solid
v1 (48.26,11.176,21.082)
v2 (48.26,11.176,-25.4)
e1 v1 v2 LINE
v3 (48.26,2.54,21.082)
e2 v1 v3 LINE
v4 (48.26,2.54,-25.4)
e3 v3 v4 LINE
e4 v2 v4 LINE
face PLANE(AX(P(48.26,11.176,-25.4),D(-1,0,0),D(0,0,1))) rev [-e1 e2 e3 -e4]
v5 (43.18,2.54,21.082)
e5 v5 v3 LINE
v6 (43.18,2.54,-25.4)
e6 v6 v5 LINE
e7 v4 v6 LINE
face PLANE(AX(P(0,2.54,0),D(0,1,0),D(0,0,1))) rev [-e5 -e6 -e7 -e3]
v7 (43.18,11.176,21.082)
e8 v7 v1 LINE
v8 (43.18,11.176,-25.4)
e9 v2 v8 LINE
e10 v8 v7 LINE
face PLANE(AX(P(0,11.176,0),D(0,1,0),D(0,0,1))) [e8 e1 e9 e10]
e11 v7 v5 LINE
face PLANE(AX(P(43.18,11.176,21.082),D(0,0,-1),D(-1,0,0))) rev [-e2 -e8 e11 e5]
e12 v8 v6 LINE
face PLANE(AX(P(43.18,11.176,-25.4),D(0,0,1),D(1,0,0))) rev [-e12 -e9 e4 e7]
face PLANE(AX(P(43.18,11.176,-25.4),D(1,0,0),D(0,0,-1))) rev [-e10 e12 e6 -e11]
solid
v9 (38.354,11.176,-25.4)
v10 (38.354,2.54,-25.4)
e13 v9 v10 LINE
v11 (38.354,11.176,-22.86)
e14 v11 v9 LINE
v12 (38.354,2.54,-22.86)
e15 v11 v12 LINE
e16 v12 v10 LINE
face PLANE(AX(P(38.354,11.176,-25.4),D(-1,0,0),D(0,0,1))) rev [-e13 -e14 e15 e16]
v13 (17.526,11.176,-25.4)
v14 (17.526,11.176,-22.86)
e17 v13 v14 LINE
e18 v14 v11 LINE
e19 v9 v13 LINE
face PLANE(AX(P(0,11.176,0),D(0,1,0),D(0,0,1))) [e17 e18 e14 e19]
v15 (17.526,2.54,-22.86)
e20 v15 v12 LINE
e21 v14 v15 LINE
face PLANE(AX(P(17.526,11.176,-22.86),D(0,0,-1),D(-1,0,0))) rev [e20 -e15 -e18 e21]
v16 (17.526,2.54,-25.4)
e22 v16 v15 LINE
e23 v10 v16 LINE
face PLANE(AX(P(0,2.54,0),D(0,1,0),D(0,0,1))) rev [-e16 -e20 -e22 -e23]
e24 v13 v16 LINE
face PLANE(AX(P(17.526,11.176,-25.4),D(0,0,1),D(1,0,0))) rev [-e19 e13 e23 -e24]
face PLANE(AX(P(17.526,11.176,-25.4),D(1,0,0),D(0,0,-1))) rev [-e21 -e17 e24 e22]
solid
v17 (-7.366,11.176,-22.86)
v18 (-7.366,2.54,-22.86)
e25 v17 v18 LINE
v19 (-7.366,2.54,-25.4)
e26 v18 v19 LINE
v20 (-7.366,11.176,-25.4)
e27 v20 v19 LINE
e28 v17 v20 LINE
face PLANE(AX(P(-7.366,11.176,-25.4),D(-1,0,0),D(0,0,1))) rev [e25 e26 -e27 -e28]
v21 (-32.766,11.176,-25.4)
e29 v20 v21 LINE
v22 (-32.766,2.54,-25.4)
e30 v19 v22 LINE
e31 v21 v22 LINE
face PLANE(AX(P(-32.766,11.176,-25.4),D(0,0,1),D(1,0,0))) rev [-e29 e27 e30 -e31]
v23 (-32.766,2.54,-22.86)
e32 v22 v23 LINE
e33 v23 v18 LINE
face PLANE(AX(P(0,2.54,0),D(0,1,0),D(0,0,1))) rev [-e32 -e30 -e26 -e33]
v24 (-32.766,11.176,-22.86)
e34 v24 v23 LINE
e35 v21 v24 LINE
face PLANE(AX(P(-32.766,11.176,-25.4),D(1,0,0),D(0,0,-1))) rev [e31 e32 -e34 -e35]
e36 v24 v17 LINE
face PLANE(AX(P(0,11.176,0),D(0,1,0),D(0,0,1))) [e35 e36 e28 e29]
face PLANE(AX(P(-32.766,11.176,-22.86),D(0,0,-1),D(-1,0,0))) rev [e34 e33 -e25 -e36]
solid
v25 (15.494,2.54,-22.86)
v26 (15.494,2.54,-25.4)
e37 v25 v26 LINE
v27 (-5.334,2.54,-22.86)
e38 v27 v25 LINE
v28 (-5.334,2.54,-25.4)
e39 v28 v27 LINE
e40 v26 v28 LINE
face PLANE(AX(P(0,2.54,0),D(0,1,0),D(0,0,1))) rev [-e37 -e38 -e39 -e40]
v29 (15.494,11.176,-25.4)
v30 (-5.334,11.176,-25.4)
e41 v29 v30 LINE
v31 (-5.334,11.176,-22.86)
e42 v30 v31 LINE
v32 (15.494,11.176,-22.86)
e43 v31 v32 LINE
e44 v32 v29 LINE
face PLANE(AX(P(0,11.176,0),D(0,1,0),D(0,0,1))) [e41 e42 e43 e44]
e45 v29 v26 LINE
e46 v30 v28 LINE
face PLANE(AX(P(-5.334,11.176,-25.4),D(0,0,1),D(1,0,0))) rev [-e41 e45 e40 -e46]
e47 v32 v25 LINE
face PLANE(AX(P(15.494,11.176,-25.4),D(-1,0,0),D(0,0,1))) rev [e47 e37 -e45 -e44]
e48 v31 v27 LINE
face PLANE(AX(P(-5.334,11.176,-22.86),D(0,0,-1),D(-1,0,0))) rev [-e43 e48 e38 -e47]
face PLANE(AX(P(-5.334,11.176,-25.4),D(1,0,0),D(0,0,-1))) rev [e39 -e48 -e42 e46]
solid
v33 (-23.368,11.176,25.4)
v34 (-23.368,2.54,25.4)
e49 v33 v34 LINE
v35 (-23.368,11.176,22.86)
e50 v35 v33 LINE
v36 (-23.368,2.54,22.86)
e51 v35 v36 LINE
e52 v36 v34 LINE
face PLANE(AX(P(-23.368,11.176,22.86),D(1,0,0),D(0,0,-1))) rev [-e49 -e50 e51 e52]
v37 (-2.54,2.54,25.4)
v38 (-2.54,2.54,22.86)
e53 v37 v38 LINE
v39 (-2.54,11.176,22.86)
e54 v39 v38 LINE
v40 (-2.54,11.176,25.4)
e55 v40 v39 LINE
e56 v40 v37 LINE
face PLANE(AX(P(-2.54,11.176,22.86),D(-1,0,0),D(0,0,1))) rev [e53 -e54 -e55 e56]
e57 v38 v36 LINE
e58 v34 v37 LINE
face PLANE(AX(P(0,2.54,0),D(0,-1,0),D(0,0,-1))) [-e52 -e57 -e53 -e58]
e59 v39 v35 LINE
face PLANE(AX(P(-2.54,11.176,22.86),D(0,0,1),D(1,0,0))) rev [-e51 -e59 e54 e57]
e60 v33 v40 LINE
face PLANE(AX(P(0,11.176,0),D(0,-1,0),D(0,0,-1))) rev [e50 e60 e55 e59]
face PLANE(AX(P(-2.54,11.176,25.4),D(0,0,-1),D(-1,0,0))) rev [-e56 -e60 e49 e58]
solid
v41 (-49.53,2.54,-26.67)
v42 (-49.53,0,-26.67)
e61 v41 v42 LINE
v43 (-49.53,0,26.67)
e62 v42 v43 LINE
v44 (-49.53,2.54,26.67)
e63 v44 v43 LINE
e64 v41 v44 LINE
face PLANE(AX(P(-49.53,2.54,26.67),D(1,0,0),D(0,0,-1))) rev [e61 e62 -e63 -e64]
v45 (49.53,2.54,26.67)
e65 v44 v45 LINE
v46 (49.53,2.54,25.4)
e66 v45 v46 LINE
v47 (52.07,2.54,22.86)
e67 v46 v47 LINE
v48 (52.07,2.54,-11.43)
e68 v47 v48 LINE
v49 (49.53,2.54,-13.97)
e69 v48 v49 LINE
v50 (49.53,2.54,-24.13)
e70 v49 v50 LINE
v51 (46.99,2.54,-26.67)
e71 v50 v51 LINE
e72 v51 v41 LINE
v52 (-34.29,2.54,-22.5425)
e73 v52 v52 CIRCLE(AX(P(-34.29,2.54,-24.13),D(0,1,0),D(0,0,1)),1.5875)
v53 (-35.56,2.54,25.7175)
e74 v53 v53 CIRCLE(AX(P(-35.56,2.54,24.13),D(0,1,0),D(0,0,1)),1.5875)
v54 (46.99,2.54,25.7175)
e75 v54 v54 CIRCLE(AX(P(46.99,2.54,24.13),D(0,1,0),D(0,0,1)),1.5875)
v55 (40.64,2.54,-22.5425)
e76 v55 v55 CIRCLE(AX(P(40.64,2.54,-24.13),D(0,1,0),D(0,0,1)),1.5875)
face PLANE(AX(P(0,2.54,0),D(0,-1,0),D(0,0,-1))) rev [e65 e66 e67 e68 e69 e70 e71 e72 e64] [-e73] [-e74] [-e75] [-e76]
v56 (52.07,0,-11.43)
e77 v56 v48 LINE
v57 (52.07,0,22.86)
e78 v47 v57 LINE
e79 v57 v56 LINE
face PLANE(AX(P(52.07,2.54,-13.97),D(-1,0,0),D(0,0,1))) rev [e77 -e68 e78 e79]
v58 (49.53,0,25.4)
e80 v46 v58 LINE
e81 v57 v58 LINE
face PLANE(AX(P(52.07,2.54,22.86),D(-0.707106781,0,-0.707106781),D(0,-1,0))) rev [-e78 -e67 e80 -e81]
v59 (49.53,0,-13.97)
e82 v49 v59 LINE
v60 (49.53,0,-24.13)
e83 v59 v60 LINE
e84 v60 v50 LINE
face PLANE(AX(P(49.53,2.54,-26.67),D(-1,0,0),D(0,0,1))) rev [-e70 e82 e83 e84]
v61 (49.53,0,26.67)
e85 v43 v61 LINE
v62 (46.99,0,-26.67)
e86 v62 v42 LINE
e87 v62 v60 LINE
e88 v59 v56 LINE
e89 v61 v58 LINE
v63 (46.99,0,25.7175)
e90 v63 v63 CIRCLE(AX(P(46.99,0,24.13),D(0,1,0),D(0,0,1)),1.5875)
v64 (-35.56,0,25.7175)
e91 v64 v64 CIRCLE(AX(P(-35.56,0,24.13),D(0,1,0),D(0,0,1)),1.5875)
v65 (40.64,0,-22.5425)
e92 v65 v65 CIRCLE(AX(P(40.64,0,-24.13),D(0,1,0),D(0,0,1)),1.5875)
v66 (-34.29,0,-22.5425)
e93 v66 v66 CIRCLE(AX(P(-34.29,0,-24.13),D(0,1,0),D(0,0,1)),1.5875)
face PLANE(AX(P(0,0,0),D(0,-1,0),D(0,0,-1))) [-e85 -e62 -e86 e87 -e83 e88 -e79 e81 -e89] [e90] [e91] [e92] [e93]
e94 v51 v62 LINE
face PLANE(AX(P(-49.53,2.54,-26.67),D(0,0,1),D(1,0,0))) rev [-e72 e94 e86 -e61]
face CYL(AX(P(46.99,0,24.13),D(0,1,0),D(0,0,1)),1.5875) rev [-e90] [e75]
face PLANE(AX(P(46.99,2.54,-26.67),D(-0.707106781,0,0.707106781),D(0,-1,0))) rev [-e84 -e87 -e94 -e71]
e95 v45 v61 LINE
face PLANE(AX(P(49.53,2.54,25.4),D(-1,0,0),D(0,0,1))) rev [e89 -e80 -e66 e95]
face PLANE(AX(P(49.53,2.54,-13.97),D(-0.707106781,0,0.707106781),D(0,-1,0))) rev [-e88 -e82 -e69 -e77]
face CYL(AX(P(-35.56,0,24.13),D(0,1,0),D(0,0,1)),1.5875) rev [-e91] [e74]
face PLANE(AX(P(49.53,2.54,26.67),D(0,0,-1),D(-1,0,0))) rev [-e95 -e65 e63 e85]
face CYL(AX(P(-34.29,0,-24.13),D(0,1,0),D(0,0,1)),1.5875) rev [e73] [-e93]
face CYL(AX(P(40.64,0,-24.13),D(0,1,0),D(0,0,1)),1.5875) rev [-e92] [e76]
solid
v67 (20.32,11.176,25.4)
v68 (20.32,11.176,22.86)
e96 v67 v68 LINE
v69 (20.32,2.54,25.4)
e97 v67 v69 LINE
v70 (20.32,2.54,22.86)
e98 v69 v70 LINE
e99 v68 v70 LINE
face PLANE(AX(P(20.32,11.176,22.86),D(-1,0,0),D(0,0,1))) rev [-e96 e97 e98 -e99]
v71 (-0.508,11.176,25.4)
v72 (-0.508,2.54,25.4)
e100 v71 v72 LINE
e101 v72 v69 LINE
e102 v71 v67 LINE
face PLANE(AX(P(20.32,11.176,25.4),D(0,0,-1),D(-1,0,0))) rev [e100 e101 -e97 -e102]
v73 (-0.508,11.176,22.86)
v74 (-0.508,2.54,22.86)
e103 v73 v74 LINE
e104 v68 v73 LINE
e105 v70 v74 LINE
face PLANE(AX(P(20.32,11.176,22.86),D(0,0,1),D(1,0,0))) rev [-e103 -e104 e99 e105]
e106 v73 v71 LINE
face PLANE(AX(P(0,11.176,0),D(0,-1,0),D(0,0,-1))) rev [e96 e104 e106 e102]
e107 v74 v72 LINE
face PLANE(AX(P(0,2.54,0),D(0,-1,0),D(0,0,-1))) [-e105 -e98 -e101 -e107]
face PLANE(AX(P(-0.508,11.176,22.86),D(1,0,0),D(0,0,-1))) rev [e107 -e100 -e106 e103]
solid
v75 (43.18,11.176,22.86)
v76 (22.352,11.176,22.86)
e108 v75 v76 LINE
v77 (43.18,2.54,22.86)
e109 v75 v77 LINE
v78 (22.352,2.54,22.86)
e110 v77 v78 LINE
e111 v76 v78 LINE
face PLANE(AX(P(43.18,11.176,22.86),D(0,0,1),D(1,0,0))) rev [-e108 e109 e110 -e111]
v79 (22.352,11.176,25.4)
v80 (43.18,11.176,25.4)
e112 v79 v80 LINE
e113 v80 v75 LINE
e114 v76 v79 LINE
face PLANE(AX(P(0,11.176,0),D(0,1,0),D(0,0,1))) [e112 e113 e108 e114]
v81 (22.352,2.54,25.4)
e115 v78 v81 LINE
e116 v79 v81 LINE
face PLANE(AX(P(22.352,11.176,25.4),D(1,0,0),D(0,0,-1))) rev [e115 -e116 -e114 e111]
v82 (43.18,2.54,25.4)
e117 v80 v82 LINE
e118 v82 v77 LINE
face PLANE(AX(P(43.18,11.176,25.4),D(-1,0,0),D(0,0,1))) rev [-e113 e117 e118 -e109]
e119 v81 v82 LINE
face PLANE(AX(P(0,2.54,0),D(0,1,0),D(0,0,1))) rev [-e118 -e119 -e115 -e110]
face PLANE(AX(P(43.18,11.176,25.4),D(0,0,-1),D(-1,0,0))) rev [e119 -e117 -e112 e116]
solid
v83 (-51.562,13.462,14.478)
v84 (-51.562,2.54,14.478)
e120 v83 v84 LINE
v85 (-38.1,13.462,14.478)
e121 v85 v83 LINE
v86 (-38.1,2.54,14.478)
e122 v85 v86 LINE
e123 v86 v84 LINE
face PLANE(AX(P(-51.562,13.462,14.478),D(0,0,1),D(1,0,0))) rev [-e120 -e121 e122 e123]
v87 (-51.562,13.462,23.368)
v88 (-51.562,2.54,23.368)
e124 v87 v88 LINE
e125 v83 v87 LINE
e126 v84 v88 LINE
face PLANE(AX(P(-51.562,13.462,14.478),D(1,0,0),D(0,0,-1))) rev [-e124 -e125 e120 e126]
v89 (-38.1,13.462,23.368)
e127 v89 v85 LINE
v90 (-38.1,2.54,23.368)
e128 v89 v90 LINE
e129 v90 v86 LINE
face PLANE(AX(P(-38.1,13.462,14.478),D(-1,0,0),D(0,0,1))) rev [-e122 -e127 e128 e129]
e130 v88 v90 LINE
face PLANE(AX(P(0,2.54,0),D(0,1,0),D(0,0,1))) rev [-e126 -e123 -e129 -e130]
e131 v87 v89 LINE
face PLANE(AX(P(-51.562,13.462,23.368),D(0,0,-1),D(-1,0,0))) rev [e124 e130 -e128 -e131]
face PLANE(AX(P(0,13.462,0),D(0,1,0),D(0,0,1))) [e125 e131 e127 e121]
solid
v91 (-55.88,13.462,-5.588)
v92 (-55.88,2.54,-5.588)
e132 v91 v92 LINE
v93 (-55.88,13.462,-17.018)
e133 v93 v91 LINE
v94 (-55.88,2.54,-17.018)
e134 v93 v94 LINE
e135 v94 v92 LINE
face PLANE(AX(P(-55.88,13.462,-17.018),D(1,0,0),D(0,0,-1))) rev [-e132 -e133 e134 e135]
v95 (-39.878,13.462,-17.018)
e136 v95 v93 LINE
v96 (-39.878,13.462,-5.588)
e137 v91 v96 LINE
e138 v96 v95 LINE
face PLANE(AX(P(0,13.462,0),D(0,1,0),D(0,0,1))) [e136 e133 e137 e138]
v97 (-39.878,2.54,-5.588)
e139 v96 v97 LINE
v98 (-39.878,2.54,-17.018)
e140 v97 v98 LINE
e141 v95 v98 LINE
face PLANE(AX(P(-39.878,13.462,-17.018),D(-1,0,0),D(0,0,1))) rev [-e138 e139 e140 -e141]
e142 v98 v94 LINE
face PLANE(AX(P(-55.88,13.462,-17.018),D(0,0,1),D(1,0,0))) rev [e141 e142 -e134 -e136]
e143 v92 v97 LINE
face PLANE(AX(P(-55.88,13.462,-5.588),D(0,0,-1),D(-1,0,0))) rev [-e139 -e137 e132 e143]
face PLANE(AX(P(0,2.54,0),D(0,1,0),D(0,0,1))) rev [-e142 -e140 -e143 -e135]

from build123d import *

# Parameters (mm, degrees)
BOSS_EXTRUDE1_DEPTH   = 2.54
SKETCH3_R             = 1.5875
CUT_EXTRUDE1_DEPTH    = 59.557880768
CHAMFER1_SIZE         = 2.54
SKETCH4_W             = 25.4
SKETCH4_H             = 2.54
BOSS_EXTRUDE2_DEPTH   = 8.636
SKETCH4_W_2           = 20.828
BOSS_EXTRUDE2_2_DEPTH = 8.636
BOSS_EXTRUDE2_3_DEPTH = 8.636
SKETCH4_W_3           = 5.08
SKETCH4_H_2           = 46.482
BOSS_EXTRUDE2_4_DEPTH = 8.636
BOSS_EXTRUDE2_5_DEPTH = 8.636
BOSS_EXTRUDE2_6_DEPTH = 8.636
BOSS_EXTRUDE2_7_DEPTH = 8.636
SKETCH5_W             = 16.002
SKETCH5_H             = 11.43
BOSS_EXTRUDE3_DEPTH   = 10.922
SKETCH5_W_2           = 13.462
SKETCH5_H_2           = 8.89
BOSS_EXTRUDE3_2_DEPTH = 10.922


with BuildPart() as part:
    # Sketch2 → Boss-Extrude1 (new body)
    with BuildSketch(Plane(origin=(0, 0, 0), x_dir=(1, 0, 0), z_dir=(0, 1, 0))):
        Polygon((-49.53, 26.67), (49.53, 26.67), (49.53, 13.97), (52.07, 13.97), (52.07, -25.4), (49.53, -25.4), (49.53, -26.67), (-49.53, -26.67), align=None)
    extrude(amount=BOSS_EXTRUDE1_DEPTH)

    # Sketch3 → Cut-Extrude1 (cut, through all)
    with BuildSketch(Plane(origin=(0, 2.54, 0), x_dir=(1, 0, 0), z_dir=(0, 1, 0))):
        with Locations(Location((-34.29, 24.13, 0), (0, 0, 270))):
            Circle(SKETCH3_R)
        with Locations(Location((40.64, 24.13, 0), (0, 0, 270))):
            Circle(SKETCH3_R)
        with Locations(Location((46.99, -24.13, 0), (0, 0, 270))):
            Circle(SKETCH3_R)
        with Locations(Location((-35.56, -24.13, 0), (0, 0, 270))):
            Circle(SKETCH3_R)
    extrude(amount=-CUT_EXTRUDE1_DEPTH, mode=Mode.SUBTRACT)

    # Chamfer1
    chamfer1_edges = [part.edges().sort_by_distance(p)[0] for p in [
        (52.07, 1.27, 25.4),
        (49.53, 1.27, -26.67),
        (52.07, 1.27, -13.97),
    ]]
    chamfer(chamfer1_edges, length=CHAMFER1_SIZE - 0.0001)  # a hair under: the kernel refuses the full size


with BuildPart() as body_2:
    # Sketch4 → Boss-Extrude2 (new body)
    with BuildSketch(Plane(origin=(0, 2.54, 0), x_dir=(1, 0, 0), z_dir=(0, 1, 0))):
        with Locations((-20.066, 24.13)):
            Rectangle(SKETCH4_W, SKETCH4_H)
    extrude(amount=BOSS_EXTRUDE2_DEPTH)


with BuildPart() as body_3:
    # Sketch4 → Boss-Extrude2 2 (new body)
    with BuildSketch(Plane(origin=(0, 2.54, 0), x_dir=(1, 0, 0), z_dir=(0, 1, 0))):
        with Locations((5.08, 24.13)):
            Rectangle(SKETCH4_W_2, SKETCH4_H)
    extrude(amount=BOSS_EXTRUDE2_2_DEPTH)


with BuildPart() as body_4:
    # Sketch4 → Boss-Extrude2 3 (new body)
    with BuildSketch(Plane(origin=(0, 2.54, 0), x_dir=(1, 0, 0), z_dir=(0, 1, 0))):
        with Locations((27.94, 24.13)):
            Rectangle(SKETCH4_W_2, SKETCH4_H)
    extrude(amount=BOSS_EXTRUDE2_3_DEPTH)


with BuildPart() as body_5:
    # Sketch4 → Boss-Extrude2 4 (new body)
    with BuildSketch(Plane(origin=(0, 2.54, 0), x_dir=(1, 0, 0), z_dir=(0, 1, 0))):
        with Locations((45.72, 2.159)):
            Rectangle(SKETCH4_W_3, SKETCH4_H_2)
    extrude(amount=BOSS_EXTRUDE2_4_DEPTH)


with BuildPart() as body_6:
    # Sketch4 → Boss-Extrude2 5 (new body)
    with BuildSketch(Plane(origin=(0, 2.54, 0), x_dir=(1, 0, 0), z_dir=(0, 1, 0))):
        with Locations((32.766, -24.13)):
            Rectangle(SKETCH4_W_2, SKETCH4_H)
    extrude(amount=BOSS_EXTRUDE2_5_DEPTH)


with BuildPart() as body_7:
    # Sketch4 → Boss-Extrude2 6 (new body)
    with BuildSketch(Plane(origin=(0, 2.54, 0), x_dir=(1, 0, 0), z_dir=(0, 1, 0))):
        with Locations((9.906, -24.13)):
            Rectangle(SKETCH4_W_2, SKETCH4_H)
    extrude(amount=BOSS_EXTRUDE2_6_DEPTH)


with BuildPart() as body_8:
    # Sketch4 → Boss-Extrude2 7 (new body)
    with BuildSketch(Plane(origin=(0, 2.54, 0), x_dir=(1, 0, 0), z_dir=(0, 1, 0))):
        with Locations((-12.954, -24.13)):
            Rectangle(SKETCH4_W_2, SKETCH4_H)
    extrude(amount=BOSS_EXTRUDE2_7_DEPTH)


with BuildPart() as body_9:
    # Sketch5 → Boss-Extrude3 (new body)
    with BuildSketch(Plane(origin=(0, 2.54, 0), x_dir=(1, 0, 0), z_dir=(0, 1, 0))):
        with Locations((-47.879, 11.303)):
            Rectangle(SKETCH5_W, SKETCH5_H)
    extrude(amount=BOSS_EXTRUDE3_DEPTH)


with BuildPart() as body_10:
    # Sketch5 → Boss-Extrude3 2 (new body)
    with BuildSketch(Plane(origin=(0, 2.54, 0), x_dir=(1, 0, 0), z_dir=(0, 1, 0))):
        with Locations((-44.831, -18.923)):
            Rectangle(SKETCH5_W_2, SKETCH5_H_2)
    extrude(amount=BOSS_EXTRUDE3_2_DEPTH)


solid = Compound([part.part, body_2.part, body_3.part, body_4.part, body_5.part, body_6.part, body_7.part, body_8.part, body_9.part, body_10.part])
